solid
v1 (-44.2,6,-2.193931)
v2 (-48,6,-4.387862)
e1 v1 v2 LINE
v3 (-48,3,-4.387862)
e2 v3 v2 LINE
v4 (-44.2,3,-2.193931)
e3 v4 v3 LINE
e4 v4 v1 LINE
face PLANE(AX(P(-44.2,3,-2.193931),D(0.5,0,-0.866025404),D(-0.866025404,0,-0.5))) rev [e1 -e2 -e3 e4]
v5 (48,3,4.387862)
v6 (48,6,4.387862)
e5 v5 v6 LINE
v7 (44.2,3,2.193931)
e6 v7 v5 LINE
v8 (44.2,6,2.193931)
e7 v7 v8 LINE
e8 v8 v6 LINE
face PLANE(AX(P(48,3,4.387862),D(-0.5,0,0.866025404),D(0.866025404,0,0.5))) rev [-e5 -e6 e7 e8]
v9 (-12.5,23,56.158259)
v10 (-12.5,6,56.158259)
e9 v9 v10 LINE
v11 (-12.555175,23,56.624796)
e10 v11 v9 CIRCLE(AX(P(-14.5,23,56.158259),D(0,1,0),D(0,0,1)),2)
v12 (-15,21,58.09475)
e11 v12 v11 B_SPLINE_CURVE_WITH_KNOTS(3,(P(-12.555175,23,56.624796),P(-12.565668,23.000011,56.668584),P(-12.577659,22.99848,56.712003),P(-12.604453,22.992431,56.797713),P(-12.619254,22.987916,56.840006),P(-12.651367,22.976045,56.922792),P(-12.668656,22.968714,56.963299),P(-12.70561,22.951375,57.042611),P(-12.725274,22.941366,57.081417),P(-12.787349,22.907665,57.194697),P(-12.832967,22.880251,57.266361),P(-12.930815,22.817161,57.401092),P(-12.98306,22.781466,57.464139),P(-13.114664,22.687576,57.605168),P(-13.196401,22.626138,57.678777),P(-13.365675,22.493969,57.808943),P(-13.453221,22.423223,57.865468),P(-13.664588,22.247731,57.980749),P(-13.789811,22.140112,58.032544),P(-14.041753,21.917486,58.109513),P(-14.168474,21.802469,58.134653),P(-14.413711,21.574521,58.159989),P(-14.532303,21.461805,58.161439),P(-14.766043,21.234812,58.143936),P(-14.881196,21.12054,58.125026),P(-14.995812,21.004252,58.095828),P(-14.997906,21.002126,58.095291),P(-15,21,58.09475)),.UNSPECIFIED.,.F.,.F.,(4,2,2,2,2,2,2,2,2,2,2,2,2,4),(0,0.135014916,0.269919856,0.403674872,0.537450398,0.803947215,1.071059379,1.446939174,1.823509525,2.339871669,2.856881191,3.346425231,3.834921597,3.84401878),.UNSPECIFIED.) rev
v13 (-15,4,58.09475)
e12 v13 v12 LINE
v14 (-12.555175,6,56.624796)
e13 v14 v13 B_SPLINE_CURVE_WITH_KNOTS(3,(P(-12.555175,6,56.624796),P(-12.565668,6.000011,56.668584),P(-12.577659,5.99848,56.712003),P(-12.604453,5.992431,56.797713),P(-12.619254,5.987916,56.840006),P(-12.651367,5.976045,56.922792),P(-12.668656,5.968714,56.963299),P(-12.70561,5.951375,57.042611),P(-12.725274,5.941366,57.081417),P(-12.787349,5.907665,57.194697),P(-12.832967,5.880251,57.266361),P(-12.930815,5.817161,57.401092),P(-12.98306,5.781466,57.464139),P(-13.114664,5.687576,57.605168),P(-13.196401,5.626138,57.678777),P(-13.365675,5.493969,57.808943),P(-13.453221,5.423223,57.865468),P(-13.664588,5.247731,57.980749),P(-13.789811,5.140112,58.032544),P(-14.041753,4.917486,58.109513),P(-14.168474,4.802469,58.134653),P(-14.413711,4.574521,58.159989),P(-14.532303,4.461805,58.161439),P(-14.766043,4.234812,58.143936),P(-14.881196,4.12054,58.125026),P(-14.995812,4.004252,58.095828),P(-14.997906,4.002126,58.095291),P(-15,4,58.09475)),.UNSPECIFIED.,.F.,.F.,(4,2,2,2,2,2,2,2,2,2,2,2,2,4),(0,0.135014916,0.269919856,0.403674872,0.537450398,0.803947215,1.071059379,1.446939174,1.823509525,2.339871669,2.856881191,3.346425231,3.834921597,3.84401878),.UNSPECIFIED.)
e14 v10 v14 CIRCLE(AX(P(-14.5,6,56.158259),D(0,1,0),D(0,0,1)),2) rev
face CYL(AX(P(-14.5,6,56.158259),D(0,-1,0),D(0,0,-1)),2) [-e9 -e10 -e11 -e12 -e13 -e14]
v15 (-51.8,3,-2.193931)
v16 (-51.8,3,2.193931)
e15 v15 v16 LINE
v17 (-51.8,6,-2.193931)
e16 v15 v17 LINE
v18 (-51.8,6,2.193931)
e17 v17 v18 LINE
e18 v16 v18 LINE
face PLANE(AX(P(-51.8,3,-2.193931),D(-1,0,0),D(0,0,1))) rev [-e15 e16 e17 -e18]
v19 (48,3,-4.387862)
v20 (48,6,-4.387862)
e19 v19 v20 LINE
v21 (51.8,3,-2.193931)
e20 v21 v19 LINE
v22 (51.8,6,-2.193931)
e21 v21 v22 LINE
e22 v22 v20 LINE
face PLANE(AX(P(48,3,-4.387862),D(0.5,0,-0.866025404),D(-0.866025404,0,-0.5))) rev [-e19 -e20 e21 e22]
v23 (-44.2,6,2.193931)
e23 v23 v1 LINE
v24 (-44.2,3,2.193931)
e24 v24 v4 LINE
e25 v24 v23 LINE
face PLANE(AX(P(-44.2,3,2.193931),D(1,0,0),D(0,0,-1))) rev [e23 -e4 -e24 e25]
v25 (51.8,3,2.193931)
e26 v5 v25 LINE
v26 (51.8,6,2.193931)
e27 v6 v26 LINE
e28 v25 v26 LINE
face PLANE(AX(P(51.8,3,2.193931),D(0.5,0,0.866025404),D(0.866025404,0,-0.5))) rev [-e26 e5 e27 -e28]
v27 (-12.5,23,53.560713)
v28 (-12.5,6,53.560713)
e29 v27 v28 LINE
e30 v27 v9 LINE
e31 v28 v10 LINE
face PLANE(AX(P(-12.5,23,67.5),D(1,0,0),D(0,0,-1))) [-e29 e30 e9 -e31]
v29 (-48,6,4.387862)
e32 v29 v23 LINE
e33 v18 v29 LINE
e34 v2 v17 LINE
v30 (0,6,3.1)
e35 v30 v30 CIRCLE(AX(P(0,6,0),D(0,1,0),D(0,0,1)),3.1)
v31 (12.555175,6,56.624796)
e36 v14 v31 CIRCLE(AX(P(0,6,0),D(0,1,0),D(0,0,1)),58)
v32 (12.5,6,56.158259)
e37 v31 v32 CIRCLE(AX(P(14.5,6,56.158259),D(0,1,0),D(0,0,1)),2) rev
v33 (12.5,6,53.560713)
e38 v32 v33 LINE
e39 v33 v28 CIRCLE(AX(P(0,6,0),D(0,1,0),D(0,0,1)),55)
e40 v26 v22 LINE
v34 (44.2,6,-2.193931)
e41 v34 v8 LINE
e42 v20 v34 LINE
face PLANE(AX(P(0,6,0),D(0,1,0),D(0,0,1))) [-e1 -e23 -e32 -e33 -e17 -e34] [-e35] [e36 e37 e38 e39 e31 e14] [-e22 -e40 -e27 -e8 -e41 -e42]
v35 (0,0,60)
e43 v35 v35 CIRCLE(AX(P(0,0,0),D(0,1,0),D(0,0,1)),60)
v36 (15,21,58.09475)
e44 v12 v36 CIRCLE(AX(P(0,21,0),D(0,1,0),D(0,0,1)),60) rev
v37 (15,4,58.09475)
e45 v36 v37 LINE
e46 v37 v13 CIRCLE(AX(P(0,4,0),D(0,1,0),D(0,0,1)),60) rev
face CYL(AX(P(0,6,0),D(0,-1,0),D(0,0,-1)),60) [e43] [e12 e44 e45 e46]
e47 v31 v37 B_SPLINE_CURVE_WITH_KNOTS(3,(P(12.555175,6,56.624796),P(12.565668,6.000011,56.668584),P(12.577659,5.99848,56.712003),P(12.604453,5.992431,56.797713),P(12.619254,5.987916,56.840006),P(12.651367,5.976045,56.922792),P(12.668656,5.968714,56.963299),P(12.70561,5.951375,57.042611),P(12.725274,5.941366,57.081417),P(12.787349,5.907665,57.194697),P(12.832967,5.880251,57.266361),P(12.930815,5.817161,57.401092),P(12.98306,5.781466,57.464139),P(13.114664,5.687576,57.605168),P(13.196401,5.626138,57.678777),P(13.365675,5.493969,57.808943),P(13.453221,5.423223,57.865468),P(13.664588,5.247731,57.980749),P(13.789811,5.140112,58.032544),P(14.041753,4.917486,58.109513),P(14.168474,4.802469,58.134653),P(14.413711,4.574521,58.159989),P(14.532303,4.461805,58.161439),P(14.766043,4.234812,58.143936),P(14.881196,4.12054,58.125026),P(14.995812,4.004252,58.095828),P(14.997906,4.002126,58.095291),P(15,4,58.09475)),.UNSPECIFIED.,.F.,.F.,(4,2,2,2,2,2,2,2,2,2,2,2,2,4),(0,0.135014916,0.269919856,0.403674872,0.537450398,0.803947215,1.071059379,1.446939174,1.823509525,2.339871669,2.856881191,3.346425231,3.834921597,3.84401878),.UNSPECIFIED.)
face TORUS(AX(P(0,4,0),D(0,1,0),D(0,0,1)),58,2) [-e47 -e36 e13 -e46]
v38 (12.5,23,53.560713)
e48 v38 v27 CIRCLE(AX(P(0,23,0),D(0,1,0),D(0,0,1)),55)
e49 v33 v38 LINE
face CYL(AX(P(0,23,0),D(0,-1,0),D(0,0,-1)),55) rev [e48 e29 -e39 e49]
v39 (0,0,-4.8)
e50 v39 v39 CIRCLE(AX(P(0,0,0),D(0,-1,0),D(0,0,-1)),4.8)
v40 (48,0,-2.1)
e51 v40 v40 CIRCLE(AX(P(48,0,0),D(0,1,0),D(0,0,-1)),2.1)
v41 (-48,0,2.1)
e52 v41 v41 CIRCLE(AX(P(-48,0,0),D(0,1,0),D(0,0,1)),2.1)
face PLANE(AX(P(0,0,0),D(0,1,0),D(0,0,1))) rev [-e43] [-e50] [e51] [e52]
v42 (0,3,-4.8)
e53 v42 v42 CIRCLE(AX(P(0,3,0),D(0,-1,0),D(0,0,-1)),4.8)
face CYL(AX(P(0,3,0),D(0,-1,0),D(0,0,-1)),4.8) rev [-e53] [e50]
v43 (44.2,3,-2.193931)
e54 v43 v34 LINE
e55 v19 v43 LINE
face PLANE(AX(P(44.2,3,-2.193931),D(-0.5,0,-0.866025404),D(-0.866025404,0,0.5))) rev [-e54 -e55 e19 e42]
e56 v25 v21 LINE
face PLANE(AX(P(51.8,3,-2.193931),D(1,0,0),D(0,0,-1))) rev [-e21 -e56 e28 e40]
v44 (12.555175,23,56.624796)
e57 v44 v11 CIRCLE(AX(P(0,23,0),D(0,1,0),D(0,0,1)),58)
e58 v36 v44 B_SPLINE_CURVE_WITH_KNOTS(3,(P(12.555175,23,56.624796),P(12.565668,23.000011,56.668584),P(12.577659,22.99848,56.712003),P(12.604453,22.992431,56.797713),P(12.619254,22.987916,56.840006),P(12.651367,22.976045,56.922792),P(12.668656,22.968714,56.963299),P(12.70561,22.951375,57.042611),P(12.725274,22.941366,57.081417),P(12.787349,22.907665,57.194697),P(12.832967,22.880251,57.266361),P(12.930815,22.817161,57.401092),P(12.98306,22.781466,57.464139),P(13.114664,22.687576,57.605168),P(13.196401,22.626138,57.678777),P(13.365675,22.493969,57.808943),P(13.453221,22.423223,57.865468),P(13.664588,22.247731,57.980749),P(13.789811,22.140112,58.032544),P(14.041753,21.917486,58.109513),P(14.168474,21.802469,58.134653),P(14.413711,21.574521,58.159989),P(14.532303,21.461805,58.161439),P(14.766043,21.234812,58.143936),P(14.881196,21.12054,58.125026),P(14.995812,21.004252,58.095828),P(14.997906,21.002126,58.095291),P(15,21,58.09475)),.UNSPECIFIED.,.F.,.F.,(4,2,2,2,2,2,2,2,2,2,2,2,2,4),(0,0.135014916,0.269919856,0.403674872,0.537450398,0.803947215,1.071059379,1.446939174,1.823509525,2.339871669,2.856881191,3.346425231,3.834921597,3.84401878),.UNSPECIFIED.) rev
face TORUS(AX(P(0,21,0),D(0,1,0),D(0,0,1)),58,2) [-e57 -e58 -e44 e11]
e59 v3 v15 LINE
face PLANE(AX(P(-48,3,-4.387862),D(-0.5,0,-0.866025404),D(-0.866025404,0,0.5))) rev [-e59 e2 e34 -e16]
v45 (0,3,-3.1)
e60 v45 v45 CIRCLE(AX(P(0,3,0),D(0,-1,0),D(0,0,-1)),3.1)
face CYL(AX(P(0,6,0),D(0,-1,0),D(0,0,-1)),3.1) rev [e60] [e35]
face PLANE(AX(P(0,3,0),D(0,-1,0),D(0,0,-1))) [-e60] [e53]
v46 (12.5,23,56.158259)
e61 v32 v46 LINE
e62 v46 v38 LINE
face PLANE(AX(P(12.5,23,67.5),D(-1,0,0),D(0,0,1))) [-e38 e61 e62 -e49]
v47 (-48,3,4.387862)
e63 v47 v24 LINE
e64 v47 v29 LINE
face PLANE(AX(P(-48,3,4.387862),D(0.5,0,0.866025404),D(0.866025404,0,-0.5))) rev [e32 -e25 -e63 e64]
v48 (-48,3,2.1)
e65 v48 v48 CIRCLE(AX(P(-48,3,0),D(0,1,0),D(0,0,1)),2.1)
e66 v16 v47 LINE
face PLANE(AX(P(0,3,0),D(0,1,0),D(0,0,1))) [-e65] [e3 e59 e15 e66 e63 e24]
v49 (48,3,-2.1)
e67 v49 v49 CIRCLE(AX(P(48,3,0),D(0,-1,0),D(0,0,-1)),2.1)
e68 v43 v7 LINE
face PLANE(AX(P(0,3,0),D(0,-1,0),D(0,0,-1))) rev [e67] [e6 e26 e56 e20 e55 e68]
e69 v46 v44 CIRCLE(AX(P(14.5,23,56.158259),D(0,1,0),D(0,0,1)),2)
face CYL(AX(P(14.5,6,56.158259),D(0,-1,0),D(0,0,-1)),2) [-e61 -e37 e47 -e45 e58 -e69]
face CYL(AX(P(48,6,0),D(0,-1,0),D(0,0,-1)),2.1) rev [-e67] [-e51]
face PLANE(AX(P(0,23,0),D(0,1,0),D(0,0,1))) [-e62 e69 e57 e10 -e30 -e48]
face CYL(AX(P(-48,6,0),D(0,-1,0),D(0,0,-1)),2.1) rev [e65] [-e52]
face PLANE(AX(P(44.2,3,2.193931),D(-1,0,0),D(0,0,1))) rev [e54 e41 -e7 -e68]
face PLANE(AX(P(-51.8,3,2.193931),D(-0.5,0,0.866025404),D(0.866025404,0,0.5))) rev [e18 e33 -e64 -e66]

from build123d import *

# Parameters (mm, degrees)
SKETCH1_R           = 60
SKETCH1_R_2         = 2.1
SKETCH1_R_3         = 3.1
BOSS_EXTRUDE1_DEPTH = 6
CUT_EXTRUDE1_DEPTH  = 3
SKETCH3_R           = 4.8
CUT_EXTRUDE2_DEPTH  = 3
SKETCH4_R           = 60
SKETCH4_R_2         = 55
BOSS_EXTRUDE2_DEPTH = 17
SKETCH5_W           = 25
SKETCH5_H           = 35
CUT_EXTRUDE3_DEPTH  = 87.539008545
FILLET1_R           = 2


with BuildPart() as part:
    # Sketch1 → Boss-Extrude1 (new body)
    with BuildSketch(Plane(origin=(0, 0, 0), x_dir=(1, 0, 0), z_dir=(0, 1, 0))):
        with Locations(Location((0, 0, 0), (0, 0, 270))):
            Circle(SKETCH1_R)
        with Locations(Location((-48, 0, 0), (0, 0, 270))):
            Circle(SKETCH1_R_2, mode=Mode.SUBTRACT)
        with Locations(Location((0, 0, 0), (0, 0, 270))):
            Circle(SKETCH1_R_3, mode=Mode.SUBTRACT)
        with Locations(Location((48, 0, 0), (0, 0, 90))):
            Circle(SKETCH1_R_2, mode=Mode.SUBTRACT)
    extrude(amount=BOSS_EXTRUDE1_DEPTH)

    # Sketch2 → Cut-Extrude1 (cut)
    with BuildSketch(Plane(origin=(0, 6, 0), x_dir=(1, 0, 0), z_dir=(0, 1, 0))):
        Polygon((-51.8, 2.193931023), (-51.8, -2.193931023), (-48, -4.387862046), (-44.2, -2.193931023), (-44.2, 2.193931023), (-48, 4.387862046), align=None)
        Polygon((48, 4.387862046), (51.8, 2.193931023), (51.8, -2.193931023), (48, -4.387862046), (44.2, -2.193931023), (44.2, 2.193931023), align=None)
    extrude(amount=-CUT_EXTRUDE1_DEPTH, mode=Mode.SUBTRACT)

    # Sketch3 → Cut-Extrude2 (cut)
    with BuildSketch(Plane.XZ):
        with Locations(Location((0, 0, 0), (0, 0, 270))):
            Circle(SKETCH3_R)
    extrude(amount=-CUT_EXTRUDE2_DEPTH, mode=Mode.SUBTRACT)

    # Sketch4 → Boss-Extrude2 (add)
    with BuildSketch(Plane(origin=(0, 6, 0), x_dir=(1, 0, 0), z_dir=(0, 1, 0))):
        with Locations(Location((0, 0, 0), (0, 0, 270))):
            Circle(SKETCH4_R)
        with Locations(Location((0, 0, 0), (0, 0, 270))):
            Circle(SKETCH4_R_2, mode=Mode.SUBTRACT)
    extrude(amount=BOSS_EXTRUDE2_DEPTH)

    # Sketch5 → Cut-Extrude3 (cut, through all)
    with BuildSketch(Plane(origin=(0, 6, 0), x_dir=(1, 0, 0), z_dir=(0, 1, 0))):
        with Locations((0, -50)):
            Rectangle(SKETCH5_W, SKETCH5_H)
    extrude(amount=CUT_EXTRUDE3_DEPTH, mode=Mode.SUBTRACT)

    # Fillet1
    # the kernel refuses this fillet: 2 mm, written as the material it takes off along each edge
    with BuildSketch(Plane(origin=(0, 23, 0), x_dir=(0.12573543795396686, 0, 0.9920638082515278), z_dir=(-0.9920638082515278, 0, 0.12573543795396686))) as fillet1_piece_1:
        with BuildLine():
            CenterArc((60 - FILLET1_R, -FILLET1_R), FILLET1_R, 0, 90)
            Line((60 - FILLET1_R, 0), (60, 0))
            Line((60, 0), (60, -FILLET1_R))
        make_face()
    revolve(axis=Axis((0, 23, 0), (0, 1, 0)), revolution_arc=345.553543265, mode=Mode.SUBTRACT)
    with BuildSketch(Plane(origin=(-12.5, 29.420959094, 58.683472972), x_dir=(-0.973374835212885, 0, -0.2292191749707888), z_dir=(0, -1, 0))) as fillet1_piece_2:
        with BuildLine():
            CenterArc((2.525577244, 1.999541851), FILLET1_R, 166.748894317, 104.477512186)
            Line((0.578827573, 2.457980201), (0, 0))
            ThreePointArc((0, 0), (1.284191819, -0.013744479), (2.568383638, 0))
        make_face()
    extrude(amount=23.420959094, mode=Mode.SUBTRACT)
    with BuildSketch(Plane(origin=(12.5, 29.420959094, 58.683472972), x_dir=(0.9733748352128844, 0, -0.22921917497079108), z_dir=(0, -1, 0))) as fillet1_piece_3:
        with BuildLine():
            CenterArc((2.525577244, -1.999541851), FILLET1_R, 88.773593497, 104.477512186)
            Line((0.578827573, -2.457980201), (0, 0))
            ThreePointArc((0, 0), (1.284191819, 0.013744479), (2.568383638, 0))
        make_face()
    extrude(amount=23.420959094, mode=Mode.SUBTRACT)
    with BuildSketch(Plane(origin=(0, 6, 0), x_dir=(0.2890214661785548, 0, 0.9573226165133667), z_dir=(0.9573226165133667, 0, -0.2890214661785548))) as fillet1_piece_4_section:
        with BuildLine():
            CenterArc((60 - FILLET1_R, FILLET1_R), FILLET1_R, 270, 90)
            Line((60 - FILLET1_R, 0), (60, 0))
            Line((60, 0), (60, FILLET1_R))
        make_face()
    fillet1_piece_4 = revolve(axis=Axis((0, 6, 0), (0, -1, 0)), revolution_arc=16.799381702, mode=Mode.PRIVATE)
    fillet1_piece_4 = split(fillet1_piece_4, bisect_by=Plane(origin=(12.5, 5.547238018, 59.104221097), z_dir=(-1, 0, 0)), keep=Keep.TOP, mode=Mode.PRIVATE)
    add(fillet1_piece_4, mode=Mode.SUBTRACT)
    with BuildSketch(Plane(origin=(0, 6, 0), x_dir=(0, 0, 1), z_dir=(1, 0, 0))) as fillet1_piece_5_section:
        with BuildLine():
            CenterArc((60 - FILLET1_R, FILLET1_R), FILLET1_R, 270, 90)
            Line((60 - FILLET1_R, 0), (60, 0))
            Line((60, 0), (60, FILLET1_R))
        make_face()
    fillet1_piece_5 = revolve(axis=Axis((0, 6, 0), (0, -1, 0)), revolution_arc=16.799381702, mode=Mode.PRIVATE)
    fillet1_piece_5 = split(fillet1_piece_5, bisect_by=Plane(origin=(-12.5, 5.5472381, 59.104220547), z_dir=(1, 0, 0)), keep=Keep.TOP, mode=Mode.PRIVATE)
    add(fillet1_piece_5, mode=Mode.SUBTRACT)
    with BuildSketch(Plane(origin=(0, 6, 0), x_dir=(0, 0, 1), z_dir=(1, 0, 0))) as fillet1_piece_6a_section:
        with BuildLine():
            CenterArc((60 - FILLET1_R, FILLET1_R), FILLET1_R, 270, 90)
            Line((60 - FILLET1_R, 0), (60, 0))
            Line((60, 0), (60, FILLET1_R))
        make_face()
    fillet1_piece_6a = revolve(axis=Axis((0, 6, 0), (0, -1, 0)), revolution_arc=16.799381702, mode=Mode.PRIVATE)
    fillet1_piece_6a = split(fillet1_piece_6a, bisect_by=Plane(origin=(-12.5, 5.540518873, 57.656474574), z_dir=(-1, 0, 0)), keep=Keep.TOP, mode=Mode.PRIVATE)
    with BuildSketch(Plane(origin=(-12.5, 29.420959094, 58.683472972), x_dir=(-0.973374835212885, 0, -0.2292191749707888), z_dir=(0, -1, 0))) as fillet1_piece_6b_section:
        with BuildLine():
            CenterArc((2.525577244, 1.999541851), FILLET1_R, 166.748894317, 104.477512186)
            Line((0.578827573, 2.457980201), (0, 0))
            ThreePointArc((0, 0), (1.284191819, -0.013744479), (2.568383638, 0))
        make_face()
    fillet1_piece_6b = extrude(amount=29.841918188, mode=Mode.PRIVATE)
    fillet1_piece_6b = split(fillet1_piece_6b, bisect_by=Plane(origin=(-13.085266846, 6, 57.965433437), z_dir=(0, -1, 0)), keep=Keep.TOP, mode=Mode.PRIVATE)
    fillet1_piece_6 = fillet1_piece_6a & fillet1_piece_6b
    add(fillet1_piece_6, mode=Mode.SUBTRACT)
    with BuildSketch(Plane(origin=(12.5, 29.420959094, 58.683472972), x_dir=(0.9733748352128844, 0, -0.22921917497079108), z_dir=(0, -1, 0))) as fillet1_piece_7a_section:
        with BuildLine():
            CenterArc((2.525577244, -1.999541851), FILLET1_R, 88.773593497, 104.477512186)
            Line((0.578827573, -2.457980201), (0, 0))
            ThreePointArc((0, 0), (1.284191819, 0.013744479), (2.568383638, 0))
        make_face()
    fillet1_piece_7a = extrude(amount=29.841918188, mode=Mode.PRIVATE)
    fillet1_piece_7a = split(fillet1_piece_7a, bisect_by=Plane(origin=(13.085266846, 6, 57.965433437), z_dir=(0, -1, 0)), keep=Keep.TOP, mode=Mode.PRIVATE)
    with BuildSketch(Plane(origin=(0, 6, 0), x_dir=(0.2890214661785548, 0, 0.9573226165133667), z_dir=(0.9573226165133667, 0, -0.2890214661785548))) as fillet1_piece_7b_section:
        with BuildLine():
            CenterArc((60 - FILLET1_R, FILLET1_R), FILLET1_R, 270, 90)
            Line((60 - FILLET1_R, 0), (60, 0))
            Line((60, 0), (60, FILLET1_R))
        make_face()
    fillet1_piece_7b = revolve(axis=Axis((0, 6, 0), (0, -1, 0)), revolution_arc=16.799381702, mode=Mode.PRIVATE)
    fillet1_piece_7b = split(fillet1_piece_7b, bisect_by=Plane(origin=(12.5, 5.540518947, 57.656474329), z_dir=(1, 0, 0)), keep=Keep.TOP, mode=Mode.PRIVATE)
    fillet1_piece_7 = fillet1_piece_7a & fillet1_piece_7b
    add(fillet1_piece_7, mode=Mode.SUBTRACT)


solid = part.part
